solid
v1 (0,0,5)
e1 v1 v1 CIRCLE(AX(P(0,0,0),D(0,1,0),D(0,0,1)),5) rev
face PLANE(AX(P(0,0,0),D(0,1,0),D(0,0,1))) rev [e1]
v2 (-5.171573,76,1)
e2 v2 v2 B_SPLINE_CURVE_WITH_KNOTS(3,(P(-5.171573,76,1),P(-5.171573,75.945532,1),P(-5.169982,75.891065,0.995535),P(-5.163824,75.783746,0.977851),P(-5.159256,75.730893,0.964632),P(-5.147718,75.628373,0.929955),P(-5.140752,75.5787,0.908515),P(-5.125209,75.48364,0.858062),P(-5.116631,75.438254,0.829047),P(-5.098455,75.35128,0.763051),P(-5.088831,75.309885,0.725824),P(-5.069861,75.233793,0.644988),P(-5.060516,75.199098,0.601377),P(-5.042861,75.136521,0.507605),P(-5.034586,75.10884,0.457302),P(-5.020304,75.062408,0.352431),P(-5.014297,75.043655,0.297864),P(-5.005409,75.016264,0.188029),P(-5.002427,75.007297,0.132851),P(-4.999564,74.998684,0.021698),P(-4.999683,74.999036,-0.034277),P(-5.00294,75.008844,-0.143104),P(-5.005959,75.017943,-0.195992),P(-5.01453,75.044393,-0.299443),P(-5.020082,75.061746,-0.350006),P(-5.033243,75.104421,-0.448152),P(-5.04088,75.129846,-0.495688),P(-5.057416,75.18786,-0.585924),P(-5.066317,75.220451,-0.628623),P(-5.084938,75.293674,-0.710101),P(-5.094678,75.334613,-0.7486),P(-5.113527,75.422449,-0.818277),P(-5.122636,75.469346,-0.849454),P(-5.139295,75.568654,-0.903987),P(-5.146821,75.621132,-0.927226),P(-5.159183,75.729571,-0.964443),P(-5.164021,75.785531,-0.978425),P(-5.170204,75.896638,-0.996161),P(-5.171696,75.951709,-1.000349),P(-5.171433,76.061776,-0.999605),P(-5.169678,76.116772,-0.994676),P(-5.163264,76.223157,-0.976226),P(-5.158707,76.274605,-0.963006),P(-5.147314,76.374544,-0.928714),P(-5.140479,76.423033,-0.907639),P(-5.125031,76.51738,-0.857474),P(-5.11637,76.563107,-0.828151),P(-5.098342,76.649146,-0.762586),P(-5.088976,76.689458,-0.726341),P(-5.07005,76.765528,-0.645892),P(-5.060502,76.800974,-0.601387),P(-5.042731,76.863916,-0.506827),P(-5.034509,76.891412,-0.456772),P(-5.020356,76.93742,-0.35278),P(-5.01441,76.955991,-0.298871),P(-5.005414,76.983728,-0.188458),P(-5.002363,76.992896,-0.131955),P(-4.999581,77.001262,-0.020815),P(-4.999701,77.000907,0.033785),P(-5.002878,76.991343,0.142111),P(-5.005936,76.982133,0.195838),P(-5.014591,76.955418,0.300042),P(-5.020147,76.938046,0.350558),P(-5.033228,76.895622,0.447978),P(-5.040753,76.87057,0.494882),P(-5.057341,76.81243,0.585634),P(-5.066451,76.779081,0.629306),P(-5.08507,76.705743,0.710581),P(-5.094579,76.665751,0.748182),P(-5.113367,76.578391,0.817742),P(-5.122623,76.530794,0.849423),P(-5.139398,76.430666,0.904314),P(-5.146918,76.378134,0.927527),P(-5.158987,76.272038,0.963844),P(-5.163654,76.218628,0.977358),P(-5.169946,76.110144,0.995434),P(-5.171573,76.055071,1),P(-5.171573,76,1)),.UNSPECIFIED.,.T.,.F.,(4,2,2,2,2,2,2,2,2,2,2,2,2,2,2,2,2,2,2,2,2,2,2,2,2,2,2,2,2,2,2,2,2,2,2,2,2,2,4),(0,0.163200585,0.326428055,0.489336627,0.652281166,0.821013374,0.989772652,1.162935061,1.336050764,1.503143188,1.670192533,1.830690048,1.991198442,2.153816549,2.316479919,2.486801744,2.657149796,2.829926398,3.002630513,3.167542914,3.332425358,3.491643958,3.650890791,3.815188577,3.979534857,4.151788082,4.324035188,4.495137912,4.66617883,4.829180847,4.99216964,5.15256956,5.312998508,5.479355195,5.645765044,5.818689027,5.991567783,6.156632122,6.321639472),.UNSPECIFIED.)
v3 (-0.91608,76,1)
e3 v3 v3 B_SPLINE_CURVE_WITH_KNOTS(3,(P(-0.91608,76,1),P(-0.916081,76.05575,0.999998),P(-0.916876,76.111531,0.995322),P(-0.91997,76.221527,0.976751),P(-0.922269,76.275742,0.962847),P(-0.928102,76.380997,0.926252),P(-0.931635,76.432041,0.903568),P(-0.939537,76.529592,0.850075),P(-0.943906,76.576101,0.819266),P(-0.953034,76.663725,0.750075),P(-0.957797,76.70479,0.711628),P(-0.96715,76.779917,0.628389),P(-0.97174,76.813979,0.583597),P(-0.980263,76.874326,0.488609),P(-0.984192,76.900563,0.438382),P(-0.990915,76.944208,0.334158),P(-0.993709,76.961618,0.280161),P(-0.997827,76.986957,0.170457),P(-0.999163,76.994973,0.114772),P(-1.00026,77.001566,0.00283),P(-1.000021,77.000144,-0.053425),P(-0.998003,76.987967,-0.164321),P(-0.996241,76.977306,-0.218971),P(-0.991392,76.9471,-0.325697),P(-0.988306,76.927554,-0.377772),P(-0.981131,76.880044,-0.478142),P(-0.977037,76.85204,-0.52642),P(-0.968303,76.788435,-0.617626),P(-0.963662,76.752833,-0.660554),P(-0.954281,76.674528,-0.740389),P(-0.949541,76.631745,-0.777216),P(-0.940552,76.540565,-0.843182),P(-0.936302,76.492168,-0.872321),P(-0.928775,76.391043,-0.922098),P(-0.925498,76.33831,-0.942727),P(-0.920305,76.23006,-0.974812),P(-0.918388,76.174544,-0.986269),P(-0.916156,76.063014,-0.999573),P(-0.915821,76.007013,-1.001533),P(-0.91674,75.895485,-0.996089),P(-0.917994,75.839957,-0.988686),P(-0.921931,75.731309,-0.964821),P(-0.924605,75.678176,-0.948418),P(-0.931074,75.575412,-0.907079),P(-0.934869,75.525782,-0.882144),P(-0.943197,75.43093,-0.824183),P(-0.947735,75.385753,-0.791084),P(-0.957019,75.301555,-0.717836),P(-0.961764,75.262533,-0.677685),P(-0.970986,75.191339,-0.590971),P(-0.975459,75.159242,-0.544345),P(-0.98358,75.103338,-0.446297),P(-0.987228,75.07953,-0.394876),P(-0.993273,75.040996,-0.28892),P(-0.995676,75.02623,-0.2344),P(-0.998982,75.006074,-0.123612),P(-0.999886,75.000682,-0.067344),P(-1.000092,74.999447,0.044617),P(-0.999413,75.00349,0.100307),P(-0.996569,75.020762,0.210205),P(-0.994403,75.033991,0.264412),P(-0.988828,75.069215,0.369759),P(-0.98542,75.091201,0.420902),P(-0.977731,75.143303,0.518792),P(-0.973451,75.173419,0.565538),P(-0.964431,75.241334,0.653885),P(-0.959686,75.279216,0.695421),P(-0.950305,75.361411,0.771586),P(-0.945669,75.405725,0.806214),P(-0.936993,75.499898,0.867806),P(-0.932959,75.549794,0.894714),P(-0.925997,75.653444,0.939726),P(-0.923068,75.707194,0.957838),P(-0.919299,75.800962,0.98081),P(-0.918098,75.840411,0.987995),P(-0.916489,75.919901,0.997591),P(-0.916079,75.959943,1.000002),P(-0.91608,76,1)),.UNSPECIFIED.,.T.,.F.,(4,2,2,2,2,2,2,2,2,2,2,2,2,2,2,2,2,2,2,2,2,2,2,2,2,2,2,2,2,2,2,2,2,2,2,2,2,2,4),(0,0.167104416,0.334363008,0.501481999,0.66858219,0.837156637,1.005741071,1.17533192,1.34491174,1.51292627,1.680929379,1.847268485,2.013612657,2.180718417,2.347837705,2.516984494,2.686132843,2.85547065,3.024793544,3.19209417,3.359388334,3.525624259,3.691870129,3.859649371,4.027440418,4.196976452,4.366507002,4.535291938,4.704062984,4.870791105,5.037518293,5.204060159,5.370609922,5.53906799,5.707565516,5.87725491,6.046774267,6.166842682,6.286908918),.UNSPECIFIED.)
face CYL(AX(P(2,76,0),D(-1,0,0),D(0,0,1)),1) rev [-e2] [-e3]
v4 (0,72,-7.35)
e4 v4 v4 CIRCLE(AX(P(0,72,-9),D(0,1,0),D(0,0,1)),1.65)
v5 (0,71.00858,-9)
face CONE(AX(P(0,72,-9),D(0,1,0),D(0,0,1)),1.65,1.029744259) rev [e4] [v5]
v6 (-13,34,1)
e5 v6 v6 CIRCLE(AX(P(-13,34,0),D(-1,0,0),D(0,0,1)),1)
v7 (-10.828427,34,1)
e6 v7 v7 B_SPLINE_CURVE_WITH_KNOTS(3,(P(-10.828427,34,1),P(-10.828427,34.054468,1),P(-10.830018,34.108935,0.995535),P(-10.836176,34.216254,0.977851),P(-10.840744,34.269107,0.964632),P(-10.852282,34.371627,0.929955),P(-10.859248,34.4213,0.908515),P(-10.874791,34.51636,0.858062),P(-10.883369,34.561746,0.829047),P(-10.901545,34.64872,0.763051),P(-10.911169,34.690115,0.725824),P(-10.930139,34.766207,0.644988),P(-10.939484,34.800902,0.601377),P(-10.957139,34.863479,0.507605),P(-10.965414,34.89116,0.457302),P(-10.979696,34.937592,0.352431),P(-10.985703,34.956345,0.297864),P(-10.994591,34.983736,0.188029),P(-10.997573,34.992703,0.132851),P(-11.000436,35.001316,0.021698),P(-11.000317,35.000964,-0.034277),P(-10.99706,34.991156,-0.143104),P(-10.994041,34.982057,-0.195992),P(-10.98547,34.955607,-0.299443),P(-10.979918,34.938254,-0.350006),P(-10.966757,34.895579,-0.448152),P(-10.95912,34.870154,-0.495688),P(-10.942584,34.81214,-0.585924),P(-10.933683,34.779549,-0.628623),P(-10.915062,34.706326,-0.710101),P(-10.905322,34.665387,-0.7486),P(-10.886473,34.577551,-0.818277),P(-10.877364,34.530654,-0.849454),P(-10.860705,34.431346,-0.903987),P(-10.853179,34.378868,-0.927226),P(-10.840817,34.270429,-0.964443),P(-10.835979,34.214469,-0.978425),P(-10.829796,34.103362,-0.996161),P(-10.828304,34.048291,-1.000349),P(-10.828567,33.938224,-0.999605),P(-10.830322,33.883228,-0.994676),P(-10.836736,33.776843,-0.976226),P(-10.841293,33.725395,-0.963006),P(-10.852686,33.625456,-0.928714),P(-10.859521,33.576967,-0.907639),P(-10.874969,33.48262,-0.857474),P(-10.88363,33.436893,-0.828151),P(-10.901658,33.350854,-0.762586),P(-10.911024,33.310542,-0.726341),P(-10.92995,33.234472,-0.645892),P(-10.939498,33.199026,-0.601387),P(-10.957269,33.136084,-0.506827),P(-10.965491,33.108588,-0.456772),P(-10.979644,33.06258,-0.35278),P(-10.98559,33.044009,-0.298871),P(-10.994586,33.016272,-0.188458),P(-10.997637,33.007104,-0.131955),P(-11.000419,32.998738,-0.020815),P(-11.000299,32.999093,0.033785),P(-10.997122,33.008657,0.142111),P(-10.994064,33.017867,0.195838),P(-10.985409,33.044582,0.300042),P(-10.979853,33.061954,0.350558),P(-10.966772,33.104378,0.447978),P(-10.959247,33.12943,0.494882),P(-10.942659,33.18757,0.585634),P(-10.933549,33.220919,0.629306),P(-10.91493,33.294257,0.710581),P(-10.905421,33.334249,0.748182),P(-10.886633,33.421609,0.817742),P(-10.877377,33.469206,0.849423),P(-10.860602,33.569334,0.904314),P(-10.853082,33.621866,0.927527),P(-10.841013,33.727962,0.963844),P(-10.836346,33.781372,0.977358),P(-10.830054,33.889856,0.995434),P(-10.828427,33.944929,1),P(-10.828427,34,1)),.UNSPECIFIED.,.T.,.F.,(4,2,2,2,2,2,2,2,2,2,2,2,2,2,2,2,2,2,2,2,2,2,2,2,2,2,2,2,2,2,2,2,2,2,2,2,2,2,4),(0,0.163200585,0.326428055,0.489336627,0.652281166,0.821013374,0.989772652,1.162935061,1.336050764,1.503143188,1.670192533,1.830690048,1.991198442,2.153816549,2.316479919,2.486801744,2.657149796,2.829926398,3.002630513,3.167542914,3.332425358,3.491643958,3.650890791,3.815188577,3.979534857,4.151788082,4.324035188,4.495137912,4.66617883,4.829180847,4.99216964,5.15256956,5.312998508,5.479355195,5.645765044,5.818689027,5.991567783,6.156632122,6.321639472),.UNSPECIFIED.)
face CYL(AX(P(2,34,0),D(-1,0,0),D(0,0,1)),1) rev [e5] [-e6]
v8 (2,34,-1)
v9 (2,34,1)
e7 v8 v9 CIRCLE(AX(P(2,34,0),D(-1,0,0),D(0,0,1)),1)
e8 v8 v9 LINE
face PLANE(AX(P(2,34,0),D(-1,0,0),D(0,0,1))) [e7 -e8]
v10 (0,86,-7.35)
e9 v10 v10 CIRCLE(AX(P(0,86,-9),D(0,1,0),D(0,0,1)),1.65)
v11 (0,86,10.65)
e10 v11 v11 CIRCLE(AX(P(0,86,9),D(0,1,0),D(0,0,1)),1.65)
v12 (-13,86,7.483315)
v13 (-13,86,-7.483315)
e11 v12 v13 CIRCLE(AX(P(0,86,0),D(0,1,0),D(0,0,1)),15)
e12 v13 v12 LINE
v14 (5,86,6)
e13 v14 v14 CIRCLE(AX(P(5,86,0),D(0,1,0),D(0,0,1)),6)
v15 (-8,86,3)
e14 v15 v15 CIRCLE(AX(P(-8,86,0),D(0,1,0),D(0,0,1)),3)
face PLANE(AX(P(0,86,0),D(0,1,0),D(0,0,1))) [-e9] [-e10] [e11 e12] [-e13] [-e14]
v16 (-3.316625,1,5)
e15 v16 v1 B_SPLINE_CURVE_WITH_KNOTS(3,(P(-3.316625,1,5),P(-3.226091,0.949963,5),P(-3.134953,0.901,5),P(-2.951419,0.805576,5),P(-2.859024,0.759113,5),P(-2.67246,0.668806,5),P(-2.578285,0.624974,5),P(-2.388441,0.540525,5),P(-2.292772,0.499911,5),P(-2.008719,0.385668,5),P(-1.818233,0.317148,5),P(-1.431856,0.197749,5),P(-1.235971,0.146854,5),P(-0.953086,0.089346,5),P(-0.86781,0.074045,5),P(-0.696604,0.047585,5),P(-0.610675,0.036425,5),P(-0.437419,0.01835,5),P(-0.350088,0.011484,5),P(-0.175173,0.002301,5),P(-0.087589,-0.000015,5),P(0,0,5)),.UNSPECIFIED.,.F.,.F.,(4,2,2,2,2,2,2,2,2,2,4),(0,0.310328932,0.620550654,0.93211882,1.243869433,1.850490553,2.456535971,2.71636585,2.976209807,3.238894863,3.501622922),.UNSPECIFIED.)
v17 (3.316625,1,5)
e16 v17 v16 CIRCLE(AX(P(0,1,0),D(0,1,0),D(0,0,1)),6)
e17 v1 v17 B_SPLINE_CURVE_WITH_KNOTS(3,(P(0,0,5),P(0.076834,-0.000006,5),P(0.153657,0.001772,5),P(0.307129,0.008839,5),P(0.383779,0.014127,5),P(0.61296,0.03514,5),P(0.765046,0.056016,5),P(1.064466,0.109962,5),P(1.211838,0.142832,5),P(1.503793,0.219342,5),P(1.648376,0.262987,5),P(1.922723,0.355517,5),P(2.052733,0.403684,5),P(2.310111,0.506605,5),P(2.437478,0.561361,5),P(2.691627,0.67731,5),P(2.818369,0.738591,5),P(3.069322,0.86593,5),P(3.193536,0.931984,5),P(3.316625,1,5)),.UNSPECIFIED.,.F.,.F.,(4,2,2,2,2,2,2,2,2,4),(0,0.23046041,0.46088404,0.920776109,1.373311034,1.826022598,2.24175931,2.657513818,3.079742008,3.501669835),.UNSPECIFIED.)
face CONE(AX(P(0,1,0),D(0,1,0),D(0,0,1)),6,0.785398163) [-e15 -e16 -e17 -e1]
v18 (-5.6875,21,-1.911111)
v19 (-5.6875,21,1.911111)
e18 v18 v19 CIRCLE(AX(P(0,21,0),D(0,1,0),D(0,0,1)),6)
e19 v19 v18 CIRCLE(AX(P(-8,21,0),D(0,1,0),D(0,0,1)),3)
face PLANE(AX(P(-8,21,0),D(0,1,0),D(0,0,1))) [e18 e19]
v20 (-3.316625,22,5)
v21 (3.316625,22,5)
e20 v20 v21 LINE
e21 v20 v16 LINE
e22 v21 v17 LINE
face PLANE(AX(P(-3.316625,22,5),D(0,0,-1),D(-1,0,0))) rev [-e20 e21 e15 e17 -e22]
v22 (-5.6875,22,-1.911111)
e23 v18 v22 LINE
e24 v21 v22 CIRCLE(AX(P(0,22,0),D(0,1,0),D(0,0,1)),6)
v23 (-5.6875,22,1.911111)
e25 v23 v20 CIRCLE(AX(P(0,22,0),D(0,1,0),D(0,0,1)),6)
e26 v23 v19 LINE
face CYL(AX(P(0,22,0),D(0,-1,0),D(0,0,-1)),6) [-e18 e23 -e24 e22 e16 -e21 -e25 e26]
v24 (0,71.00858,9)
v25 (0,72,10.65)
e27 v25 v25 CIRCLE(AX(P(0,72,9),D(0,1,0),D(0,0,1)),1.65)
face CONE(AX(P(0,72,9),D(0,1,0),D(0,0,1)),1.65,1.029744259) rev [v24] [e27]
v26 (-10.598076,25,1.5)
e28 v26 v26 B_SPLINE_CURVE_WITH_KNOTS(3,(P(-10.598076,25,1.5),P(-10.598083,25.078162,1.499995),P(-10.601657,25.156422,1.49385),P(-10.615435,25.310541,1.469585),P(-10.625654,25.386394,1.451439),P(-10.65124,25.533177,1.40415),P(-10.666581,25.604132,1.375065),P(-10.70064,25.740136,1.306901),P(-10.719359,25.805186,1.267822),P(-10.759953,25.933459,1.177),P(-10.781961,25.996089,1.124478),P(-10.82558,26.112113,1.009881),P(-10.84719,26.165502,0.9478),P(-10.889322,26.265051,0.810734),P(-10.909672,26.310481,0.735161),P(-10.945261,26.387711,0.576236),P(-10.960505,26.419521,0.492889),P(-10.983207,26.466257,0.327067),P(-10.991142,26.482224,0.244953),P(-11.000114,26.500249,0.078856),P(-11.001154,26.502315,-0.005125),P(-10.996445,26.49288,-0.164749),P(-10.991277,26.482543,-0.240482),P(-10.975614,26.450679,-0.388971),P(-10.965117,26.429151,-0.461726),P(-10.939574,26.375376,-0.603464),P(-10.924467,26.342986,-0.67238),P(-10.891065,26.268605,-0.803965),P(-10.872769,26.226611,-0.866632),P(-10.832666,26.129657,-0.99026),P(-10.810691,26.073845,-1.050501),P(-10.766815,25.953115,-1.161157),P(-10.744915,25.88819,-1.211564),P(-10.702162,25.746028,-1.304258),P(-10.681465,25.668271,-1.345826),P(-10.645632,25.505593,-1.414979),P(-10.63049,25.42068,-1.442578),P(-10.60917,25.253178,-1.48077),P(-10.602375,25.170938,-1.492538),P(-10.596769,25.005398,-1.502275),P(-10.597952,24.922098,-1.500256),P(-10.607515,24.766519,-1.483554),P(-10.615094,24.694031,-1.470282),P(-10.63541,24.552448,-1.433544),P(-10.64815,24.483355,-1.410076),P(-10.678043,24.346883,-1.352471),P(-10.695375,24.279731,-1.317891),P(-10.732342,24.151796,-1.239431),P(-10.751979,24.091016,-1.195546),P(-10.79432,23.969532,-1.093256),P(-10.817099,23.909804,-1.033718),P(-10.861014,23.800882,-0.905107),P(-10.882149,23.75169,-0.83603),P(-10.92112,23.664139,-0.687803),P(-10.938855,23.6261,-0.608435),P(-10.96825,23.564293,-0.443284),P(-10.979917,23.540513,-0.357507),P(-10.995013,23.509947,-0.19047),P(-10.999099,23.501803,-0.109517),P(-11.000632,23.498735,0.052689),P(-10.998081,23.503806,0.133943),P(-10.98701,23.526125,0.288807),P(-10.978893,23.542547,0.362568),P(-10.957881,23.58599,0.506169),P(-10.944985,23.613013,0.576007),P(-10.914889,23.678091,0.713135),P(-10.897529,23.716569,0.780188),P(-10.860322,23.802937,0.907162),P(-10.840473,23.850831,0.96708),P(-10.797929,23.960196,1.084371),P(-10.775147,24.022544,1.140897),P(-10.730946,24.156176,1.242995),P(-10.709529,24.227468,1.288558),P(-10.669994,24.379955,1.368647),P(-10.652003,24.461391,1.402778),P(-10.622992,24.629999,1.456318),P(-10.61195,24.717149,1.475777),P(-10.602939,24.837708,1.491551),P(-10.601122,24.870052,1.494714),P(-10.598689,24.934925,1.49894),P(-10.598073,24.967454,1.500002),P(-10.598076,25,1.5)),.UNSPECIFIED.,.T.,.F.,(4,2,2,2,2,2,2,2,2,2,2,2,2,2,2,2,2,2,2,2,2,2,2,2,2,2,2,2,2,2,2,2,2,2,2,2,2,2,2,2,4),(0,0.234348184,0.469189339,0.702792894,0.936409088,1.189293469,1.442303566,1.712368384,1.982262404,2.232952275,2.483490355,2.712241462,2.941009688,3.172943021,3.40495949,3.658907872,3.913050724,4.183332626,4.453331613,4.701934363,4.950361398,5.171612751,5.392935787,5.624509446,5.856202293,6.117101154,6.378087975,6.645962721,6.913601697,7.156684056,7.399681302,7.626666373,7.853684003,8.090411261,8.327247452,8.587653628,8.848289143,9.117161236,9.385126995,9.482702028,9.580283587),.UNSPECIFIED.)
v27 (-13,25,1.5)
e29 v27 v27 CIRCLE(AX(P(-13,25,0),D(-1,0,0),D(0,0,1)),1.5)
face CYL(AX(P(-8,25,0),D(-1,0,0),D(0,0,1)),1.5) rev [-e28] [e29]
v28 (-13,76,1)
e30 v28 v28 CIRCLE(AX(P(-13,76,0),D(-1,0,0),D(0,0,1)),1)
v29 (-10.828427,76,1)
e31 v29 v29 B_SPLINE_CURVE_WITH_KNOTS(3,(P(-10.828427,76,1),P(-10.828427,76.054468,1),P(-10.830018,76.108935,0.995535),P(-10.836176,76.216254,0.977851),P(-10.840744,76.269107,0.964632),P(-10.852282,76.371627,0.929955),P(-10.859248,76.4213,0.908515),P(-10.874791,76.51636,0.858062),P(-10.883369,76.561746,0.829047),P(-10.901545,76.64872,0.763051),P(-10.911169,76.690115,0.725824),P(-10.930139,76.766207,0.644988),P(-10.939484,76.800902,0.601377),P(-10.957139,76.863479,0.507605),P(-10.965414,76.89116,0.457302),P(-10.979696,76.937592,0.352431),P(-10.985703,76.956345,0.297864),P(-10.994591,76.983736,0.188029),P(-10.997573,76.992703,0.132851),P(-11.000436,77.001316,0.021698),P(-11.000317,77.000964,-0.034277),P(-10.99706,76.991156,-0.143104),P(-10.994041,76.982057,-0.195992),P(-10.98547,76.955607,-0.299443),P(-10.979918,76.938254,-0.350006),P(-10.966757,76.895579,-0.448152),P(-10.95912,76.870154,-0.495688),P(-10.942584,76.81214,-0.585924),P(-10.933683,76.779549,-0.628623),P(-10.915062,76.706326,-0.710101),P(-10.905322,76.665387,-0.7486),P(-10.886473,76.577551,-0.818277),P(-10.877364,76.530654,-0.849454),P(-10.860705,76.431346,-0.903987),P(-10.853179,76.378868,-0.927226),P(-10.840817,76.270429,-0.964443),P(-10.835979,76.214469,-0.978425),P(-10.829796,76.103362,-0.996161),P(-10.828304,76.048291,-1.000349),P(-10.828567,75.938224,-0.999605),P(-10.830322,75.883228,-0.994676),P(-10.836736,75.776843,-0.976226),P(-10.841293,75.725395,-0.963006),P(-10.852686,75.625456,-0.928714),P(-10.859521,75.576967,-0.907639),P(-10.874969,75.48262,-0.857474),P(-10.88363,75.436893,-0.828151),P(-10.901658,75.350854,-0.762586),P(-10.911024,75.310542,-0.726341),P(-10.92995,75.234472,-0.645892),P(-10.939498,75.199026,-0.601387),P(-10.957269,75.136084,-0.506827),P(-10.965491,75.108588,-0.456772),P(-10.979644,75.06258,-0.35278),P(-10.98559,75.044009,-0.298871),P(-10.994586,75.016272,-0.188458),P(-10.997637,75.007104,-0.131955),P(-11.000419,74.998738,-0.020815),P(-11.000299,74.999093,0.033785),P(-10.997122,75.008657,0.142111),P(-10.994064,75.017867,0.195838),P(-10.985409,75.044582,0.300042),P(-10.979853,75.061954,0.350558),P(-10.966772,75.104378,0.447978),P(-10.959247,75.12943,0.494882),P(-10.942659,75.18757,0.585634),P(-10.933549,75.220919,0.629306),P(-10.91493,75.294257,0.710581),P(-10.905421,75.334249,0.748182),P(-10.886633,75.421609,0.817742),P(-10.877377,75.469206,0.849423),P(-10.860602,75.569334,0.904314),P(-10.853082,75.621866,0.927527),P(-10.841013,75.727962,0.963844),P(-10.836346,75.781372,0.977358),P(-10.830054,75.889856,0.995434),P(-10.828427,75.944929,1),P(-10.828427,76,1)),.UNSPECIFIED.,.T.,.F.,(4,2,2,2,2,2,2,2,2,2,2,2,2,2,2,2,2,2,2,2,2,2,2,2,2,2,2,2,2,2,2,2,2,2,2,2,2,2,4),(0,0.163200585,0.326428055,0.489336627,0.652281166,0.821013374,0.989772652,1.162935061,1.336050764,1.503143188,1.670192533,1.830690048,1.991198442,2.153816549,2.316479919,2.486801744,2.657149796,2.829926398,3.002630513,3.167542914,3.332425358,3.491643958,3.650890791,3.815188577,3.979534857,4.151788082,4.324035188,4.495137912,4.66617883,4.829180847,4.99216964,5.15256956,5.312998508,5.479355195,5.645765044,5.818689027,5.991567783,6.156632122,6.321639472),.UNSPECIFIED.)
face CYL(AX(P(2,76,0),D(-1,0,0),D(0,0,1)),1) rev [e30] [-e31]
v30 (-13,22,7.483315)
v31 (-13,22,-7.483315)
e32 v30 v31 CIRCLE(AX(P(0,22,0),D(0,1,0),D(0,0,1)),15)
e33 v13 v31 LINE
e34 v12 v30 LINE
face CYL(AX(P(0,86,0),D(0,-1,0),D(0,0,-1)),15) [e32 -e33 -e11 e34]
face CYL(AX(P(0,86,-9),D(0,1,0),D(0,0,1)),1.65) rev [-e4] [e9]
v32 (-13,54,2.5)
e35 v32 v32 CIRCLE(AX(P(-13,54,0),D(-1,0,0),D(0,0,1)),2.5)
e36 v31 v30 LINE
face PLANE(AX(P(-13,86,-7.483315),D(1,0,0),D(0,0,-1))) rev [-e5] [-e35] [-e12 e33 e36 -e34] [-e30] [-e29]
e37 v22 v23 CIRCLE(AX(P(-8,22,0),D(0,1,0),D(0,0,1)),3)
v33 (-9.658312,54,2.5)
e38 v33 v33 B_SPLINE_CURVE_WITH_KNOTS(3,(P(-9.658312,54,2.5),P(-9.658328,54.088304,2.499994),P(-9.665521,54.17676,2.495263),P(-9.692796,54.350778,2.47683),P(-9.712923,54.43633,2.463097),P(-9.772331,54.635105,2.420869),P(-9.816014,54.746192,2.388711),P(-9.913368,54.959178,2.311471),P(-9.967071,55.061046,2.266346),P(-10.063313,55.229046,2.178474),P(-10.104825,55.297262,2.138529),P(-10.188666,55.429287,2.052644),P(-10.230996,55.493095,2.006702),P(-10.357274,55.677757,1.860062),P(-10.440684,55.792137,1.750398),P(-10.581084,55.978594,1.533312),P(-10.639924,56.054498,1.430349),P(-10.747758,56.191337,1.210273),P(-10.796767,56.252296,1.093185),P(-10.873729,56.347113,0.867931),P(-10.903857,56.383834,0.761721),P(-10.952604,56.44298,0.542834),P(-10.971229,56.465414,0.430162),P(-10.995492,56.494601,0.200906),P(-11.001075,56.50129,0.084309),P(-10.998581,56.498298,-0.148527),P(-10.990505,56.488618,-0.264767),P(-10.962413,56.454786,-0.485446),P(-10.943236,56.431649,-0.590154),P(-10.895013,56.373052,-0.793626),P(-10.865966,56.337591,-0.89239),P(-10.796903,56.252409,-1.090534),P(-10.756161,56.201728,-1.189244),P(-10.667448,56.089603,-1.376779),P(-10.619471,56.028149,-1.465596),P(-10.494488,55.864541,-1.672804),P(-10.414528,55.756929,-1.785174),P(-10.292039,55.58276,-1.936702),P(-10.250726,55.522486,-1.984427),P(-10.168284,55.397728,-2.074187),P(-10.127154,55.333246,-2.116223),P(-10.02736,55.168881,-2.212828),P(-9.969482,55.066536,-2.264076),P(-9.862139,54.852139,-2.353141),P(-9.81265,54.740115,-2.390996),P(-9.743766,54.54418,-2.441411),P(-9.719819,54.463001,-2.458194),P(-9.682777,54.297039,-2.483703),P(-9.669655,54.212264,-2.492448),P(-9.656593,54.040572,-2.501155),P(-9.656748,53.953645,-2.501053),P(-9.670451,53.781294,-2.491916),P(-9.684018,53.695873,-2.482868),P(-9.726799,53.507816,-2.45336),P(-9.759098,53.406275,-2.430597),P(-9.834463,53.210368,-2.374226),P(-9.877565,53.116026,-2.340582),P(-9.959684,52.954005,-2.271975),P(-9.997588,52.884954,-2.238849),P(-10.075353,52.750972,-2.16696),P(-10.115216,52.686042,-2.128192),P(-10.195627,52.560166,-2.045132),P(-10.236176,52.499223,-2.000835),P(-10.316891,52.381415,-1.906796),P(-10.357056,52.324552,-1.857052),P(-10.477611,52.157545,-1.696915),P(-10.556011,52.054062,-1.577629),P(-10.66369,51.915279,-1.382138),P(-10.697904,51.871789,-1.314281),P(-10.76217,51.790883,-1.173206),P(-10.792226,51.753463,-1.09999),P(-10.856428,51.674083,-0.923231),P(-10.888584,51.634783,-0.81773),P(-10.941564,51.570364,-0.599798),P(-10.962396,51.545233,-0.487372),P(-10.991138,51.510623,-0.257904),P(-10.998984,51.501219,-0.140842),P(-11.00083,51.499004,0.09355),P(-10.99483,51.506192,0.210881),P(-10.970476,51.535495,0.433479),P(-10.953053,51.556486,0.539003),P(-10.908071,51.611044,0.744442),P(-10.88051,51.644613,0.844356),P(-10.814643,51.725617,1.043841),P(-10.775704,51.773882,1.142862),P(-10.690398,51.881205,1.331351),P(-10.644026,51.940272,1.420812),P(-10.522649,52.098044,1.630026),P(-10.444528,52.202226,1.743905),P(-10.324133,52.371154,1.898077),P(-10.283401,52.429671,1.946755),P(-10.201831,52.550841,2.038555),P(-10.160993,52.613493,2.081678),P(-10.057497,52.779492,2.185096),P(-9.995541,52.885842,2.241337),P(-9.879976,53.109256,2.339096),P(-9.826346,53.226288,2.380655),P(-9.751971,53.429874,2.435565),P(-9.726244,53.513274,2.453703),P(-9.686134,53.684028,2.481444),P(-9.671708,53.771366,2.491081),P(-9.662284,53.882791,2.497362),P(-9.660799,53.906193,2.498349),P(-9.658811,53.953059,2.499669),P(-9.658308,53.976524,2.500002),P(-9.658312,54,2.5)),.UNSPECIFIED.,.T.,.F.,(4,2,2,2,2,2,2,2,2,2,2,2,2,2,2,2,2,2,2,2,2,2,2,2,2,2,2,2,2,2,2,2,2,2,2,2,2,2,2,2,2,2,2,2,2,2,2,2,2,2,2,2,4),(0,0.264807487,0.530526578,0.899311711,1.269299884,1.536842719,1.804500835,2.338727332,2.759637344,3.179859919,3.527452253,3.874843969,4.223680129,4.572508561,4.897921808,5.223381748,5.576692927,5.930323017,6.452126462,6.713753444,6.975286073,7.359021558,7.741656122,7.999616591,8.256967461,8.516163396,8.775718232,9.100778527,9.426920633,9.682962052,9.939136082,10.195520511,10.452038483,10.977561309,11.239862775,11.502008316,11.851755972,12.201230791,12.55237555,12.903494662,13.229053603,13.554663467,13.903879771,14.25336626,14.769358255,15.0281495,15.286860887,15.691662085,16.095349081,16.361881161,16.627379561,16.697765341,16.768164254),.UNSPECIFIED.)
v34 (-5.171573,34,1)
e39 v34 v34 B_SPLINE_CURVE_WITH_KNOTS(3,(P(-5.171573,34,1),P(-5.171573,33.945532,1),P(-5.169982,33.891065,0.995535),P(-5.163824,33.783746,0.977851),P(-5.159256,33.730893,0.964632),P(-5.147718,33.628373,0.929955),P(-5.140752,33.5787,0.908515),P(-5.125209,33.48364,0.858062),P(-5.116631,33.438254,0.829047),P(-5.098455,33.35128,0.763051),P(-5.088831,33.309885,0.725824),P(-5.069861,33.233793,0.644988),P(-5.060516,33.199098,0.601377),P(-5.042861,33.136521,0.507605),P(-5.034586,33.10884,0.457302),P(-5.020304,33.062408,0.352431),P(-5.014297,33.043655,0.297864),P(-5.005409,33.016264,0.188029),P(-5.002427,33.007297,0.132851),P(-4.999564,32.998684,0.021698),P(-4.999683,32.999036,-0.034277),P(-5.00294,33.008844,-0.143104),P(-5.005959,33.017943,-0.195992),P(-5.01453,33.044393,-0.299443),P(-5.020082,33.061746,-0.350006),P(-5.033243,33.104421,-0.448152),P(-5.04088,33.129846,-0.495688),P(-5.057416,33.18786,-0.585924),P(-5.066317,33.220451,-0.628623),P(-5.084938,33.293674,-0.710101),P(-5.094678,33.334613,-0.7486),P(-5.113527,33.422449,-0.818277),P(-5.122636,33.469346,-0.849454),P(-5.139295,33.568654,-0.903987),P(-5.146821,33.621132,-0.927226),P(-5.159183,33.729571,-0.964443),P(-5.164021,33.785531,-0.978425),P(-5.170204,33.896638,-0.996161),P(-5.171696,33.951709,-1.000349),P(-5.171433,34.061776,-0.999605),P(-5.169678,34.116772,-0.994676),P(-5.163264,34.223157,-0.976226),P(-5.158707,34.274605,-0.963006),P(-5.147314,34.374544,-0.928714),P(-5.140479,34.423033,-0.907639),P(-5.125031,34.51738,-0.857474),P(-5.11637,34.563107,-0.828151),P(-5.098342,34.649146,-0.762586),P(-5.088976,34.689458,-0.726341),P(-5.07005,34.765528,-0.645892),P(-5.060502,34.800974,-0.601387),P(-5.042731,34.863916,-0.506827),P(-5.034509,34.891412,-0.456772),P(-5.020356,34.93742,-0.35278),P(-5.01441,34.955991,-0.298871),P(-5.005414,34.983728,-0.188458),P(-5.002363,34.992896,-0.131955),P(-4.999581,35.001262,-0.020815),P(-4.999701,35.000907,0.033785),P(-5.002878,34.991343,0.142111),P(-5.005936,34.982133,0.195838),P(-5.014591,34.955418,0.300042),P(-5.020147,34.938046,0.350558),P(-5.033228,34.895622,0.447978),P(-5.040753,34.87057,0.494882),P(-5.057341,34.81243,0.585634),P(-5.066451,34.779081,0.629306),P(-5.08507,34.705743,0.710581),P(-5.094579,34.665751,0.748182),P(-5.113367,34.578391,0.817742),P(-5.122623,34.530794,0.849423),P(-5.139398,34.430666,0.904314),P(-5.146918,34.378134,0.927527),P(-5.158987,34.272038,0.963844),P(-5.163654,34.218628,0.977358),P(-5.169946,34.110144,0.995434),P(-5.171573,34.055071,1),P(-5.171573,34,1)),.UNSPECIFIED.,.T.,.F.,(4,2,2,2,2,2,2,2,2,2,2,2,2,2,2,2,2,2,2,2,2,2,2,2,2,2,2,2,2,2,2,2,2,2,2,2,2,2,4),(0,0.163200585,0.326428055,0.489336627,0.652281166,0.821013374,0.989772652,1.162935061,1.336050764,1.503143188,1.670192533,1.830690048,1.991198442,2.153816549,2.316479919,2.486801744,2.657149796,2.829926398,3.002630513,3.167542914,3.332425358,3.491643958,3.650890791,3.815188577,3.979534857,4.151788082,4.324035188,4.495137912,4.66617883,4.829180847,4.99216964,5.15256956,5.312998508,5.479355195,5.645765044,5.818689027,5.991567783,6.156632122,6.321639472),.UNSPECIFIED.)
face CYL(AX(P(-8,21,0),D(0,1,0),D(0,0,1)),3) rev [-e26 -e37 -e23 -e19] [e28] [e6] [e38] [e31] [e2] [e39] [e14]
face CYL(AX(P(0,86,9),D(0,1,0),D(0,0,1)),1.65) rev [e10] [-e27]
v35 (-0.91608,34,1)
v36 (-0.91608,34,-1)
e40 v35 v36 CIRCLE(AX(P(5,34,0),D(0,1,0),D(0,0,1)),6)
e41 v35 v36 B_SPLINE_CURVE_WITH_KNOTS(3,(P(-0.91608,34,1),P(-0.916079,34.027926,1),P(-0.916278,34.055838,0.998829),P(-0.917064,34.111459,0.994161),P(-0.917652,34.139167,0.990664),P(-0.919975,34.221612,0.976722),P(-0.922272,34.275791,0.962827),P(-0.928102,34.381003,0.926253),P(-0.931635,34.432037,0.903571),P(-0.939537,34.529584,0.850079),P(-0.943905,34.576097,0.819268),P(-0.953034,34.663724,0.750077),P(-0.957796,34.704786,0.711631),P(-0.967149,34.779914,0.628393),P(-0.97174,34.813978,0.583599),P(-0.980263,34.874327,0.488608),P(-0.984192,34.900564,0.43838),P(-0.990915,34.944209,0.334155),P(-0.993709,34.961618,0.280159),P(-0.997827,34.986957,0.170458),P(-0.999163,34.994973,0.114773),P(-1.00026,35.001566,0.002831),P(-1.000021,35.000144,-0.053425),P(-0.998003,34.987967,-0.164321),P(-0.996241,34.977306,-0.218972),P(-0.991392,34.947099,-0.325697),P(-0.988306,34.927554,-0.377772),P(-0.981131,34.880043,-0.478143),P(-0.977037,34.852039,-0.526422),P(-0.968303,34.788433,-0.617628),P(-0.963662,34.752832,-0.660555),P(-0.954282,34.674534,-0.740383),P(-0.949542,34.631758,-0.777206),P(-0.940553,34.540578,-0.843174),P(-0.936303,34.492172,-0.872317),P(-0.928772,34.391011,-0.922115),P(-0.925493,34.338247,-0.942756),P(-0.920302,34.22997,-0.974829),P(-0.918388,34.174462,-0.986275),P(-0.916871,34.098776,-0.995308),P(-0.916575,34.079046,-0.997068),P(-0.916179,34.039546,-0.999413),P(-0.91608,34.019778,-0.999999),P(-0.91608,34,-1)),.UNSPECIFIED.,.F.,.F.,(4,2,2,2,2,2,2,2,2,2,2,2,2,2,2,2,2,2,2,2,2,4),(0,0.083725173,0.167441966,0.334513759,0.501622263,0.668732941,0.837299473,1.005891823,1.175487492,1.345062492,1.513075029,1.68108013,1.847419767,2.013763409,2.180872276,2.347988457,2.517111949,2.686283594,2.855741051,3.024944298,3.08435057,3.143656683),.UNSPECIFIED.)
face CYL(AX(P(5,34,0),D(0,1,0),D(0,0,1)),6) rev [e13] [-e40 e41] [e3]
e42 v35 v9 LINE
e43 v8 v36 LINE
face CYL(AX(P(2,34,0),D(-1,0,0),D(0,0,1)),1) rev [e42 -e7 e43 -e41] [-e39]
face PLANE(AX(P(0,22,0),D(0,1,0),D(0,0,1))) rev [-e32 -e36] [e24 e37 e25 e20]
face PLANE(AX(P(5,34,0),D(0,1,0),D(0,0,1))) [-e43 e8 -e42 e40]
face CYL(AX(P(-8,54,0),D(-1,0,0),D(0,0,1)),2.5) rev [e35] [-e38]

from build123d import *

# Parameters (mm, degrees)
BOSS_EXTRUDE2_DEPTH   = 22
BOSS_EXTRUDE3_DEPTH   = 64
SKETCH3_R             = 3
CUT_EXTRUDE1_DEPTH    = 65
SKETCH4_R             = 6
CUT_EXTRUDE2_DEPTH    = 52
M4_TAPPED_HOLE1_D     = 3.3
M4_TAPPED_HOLE1_DEPTH = 14
M4_TAPPED_HOLE1_TIP   = 0.991420021
SKETCH8_R             = 2.5
SKETCH8_R_2           = 1.5
CUT_EXTRUDE3_DEPTH    = 5
SKETCH9_R             = 1
CUT_EXTRUDE4_DEPTH    = 15
CHAMFER1_SIZE         = 1


with BuildPart() as part:
    # Sketch1 → Boss-Extrude2 (new body)
    with BuildSketch(Plane(origin=(0, 0, 0), x_dir=(1, 0, 0), z_dir=(0, 1, 0))):
        with BuildLine():
            Line((-3.31662479, -5), (3.31662479, -5))
            ThreePointArc((3.31662479, -5), (0, 6), (-3.31662479, -5))
        make_face()
    extrude(amount=BOSS_EXTRUDE2_DEPTH)

    # Sketch2 → Boss-Extrude3 (add)
    with BuildSketch(Plane(origin=(0, 22, 0), x_dir=(1, 0, 0), z_dir=(0, 1, 0))):
        with BuildLine():
            Line((-13, 7.483314774), (-13, -7.483314774))
            ThreePointArc((-13, -7.483314774), (15, 0), (-13, 7.483314774))
        make_face()
    extrude(amount=BOSS_EXTRUDE3_DEPTH)

    # Sketch3 → Cut-Extrude1 (cut)
    with BuildSketch(Plane(origin=(0, 86, 0), x_dir=(1, 0, 0), z_dir=(0, 1, 0))):
        with Locations(Location((-8, 0, 0), (0, 0, 270))):
            Circle(SKETCH3_R)
    extrude(amount=-CUT_EXTRUDE1_DEPTH, mode=Mode.SUBTRACT)

    # Sketch4 → Cut-Extrude2 (cut)
    with BuildSketch(Plane(origin=(0, 86, 0), x_dir=(1, 0, 0), z_dir=(0, 1, 0))):
        with Locations(Location((5, 0, 0), (0, 0, 270))):
            Circle(SKETCH4_R)
    extrude(amount=-CUT_EXTRUDE2_DEPTH, mode=Mode.SUBTRACT)

    # M4 Tapped Hole1
    with Locations(Plane(origin=(0, 86, 0), x_dir=(1, 0, 0), z_dir=(0, 1, 0))):
        with Locations((0, -9), (0, 9)):
            Hole(M4_TAPPED_HOLE1_D / 2, depth=M4_TAPPED_HOLE1_DEPTH)
            with Locations((0, 0, -(M4_TAPPED_HOLE1_DEPTH + M4_TAPPED_HOLE1_TIP / 2))):  # 118° drill point
                Cone(0, M4_TAPPED_HOLE1_D / 2, M4_TAPPED_HOLE1_TIP, mode=Mode.SUBTRACT)

    # Sketch8 → Cut-Extrude3 (cut)
    with BuildSketch(Plane.ZY.offset(13)):
        with Locations((0, 54)):
            Circle(SKETCH8_R)
        with Locations((0, 25)):
            Circle(SKETCH8_R_2)
    extrude(amount=-CUT_EXTRUDE3_DEPTH, mode=Mode.SUBTRACT)

    # Sketch9 → Cut-Extrude4 (cut)
    with BuildSketch(Plane.ZY.offset(13)):
        with Locations((0, 76)):
            Circle(SKETCH9_R)
        with Locations((0, 34)):
            Circle(SKETCH9_R)
    extrude(amount=-CUT_EXTRUDE4_DEPTH, mode=Mode.SUBTRACT)

    # Chamfer1
    chamfer1_edges = [part.edges().sort_by_distance(p)[0] for p in [
        (0, 0, -6),
    ]]
    chamfer(chamfer1_edges, length=CHAMFER1_SIZE - 0.0001)  # a hair under: the kernel refuses the full size


solid = part.part
